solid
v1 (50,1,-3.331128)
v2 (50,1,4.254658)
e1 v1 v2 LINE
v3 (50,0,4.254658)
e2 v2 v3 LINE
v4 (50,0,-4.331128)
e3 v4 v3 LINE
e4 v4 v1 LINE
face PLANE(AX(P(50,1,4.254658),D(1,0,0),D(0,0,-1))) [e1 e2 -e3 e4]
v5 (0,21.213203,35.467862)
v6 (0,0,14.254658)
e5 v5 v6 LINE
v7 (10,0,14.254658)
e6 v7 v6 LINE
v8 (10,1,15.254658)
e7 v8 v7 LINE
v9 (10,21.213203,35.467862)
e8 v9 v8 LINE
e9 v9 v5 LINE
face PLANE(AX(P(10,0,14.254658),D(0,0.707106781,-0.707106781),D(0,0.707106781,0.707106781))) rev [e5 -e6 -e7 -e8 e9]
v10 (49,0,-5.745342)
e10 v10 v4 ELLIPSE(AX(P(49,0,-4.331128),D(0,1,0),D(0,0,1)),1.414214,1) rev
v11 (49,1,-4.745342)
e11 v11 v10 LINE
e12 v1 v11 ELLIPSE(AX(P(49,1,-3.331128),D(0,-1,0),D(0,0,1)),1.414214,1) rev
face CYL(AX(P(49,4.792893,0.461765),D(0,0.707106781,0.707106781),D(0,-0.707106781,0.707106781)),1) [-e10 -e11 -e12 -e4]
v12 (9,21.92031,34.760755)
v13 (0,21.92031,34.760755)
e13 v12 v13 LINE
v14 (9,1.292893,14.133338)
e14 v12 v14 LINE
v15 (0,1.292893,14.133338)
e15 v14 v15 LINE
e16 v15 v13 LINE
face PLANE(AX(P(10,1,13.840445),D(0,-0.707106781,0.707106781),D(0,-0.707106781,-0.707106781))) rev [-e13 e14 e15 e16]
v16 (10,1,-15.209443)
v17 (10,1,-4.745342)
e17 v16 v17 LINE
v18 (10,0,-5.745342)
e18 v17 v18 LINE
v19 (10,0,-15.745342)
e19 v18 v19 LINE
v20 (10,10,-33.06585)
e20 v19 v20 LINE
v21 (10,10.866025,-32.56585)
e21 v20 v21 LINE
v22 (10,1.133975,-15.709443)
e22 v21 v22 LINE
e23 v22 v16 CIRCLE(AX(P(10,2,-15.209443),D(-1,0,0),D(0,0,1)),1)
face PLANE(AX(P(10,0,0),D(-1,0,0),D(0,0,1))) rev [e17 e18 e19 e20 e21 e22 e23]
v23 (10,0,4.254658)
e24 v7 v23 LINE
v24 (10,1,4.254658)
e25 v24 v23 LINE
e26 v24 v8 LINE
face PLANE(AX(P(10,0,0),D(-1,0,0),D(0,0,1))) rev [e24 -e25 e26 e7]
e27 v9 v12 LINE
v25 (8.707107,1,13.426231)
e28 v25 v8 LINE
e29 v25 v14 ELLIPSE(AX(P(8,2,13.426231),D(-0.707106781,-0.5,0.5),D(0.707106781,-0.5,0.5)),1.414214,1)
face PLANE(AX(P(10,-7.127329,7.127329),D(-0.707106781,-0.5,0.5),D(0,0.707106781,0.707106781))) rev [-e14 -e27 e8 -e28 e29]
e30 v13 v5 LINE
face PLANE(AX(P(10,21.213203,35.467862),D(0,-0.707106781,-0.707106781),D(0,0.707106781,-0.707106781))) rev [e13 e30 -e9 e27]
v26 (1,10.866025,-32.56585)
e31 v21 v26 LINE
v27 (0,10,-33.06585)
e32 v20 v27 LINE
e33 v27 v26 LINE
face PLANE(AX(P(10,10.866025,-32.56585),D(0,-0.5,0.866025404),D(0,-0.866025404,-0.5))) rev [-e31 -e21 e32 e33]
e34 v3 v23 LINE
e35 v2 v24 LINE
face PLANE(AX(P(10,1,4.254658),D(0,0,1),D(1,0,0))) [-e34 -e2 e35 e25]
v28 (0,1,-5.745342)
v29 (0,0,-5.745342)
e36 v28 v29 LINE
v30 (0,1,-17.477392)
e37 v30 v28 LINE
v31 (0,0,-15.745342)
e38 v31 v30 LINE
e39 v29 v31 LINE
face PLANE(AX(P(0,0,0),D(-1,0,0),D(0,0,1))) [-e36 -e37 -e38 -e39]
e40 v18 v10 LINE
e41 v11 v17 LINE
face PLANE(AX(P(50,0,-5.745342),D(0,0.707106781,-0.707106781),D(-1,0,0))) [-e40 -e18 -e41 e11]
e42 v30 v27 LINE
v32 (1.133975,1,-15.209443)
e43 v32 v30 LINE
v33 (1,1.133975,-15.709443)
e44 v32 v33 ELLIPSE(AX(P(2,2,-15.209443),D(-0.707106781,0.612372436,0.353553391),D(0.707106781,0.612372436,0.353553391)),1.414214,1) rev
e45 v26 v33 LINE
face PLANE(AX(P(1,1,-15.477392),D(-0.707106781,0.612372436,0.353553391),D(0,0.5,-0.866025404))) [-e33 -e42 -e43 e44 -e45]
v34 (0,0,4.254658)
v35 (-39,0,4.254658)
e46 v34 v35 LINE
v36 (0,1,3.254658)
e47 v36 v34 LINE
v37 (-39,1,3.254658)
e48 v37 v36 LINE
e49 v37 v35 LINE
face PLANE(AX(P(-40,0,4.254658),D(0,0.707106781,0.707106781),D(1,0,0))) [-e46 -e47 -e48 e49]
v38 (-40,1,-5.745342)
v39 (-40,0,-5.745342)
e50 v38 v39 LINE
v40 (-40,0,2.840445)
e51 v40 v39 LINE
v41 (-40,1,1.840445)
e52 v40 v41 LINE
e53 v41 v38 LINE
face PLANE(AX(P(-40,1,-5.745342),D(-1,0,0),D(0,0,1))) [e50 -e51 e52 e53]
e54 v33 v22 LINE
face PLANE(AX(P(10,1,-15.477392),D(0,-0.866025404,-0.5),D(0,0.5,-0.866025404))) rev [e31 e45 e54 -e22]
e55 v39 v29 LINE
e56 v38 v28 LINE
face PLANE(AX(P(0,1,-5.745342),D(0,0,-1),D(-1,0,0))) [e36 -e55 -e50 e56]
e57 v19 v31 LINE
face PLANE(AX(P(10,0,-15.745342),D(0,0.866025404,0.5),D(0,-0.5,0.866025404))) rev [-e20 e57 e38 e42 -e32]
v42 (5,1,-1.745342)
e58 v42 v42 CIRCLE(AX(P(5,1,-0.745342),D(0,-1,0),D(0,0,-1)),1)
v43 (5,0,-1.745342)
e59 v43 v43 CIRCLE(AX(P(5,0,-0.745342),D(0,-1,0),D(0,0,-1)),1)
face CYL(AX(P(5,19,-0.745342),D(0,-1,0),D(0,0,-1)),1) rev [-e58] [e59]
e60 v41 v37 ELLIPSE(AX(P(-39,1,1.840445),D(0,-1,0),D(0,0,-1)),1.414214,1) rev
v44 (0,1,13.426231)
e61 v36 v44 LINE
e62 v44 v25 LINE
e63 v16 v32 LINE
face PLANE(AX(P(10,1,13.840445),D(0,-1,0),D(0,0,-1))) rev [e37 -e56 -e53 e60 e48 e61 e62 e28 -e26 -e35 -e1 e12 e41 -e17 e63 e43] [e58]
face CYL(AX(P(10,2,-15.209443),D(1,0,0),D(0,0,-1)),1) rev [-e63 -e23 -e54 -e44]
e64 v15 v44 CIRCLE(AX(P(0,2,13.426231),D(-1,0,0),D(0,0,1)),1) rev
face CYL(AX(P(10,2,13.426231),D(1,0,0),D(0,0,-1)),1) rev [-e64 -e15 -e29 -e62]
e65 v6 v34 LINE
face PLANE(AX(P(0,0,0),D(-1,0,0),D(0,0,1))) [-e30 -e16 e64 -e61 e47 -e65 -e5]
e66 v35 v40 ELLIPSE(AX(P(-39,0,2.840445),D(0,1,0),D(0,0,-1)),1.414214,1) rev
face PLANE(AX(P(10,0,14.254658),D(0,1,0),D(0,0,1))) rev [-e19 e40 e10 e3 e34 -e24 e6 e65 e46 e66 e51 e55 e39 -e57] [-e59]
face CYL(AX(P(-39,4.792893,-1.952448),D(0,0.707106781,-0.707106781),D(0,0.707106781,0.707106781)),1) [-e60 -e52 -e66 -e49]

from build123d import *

# Parameters (mm, degrees)
TOP_BLADE_FIRST_EXTRUDE_DEPTH  = 10
SKETCH3_W                      = 40
SKETCH3_H                      = 10
TOP_BLADE_SECOND_EXTRUDE_DEPTH = 1
TOP_BLADE_CUT_1_SIZE           = 1
TOP_BLADE_ROUNDING_1_R         = 1
SKETCH5_R                      = 1
TOP_BLADE_CUT_2_DEPTH          = 19
TOP_BLADE_ROUNDING_2_R         = 1


with BuildPart() as part:
    # Sketch1 → Top Blade First Extrude (new body)
    with BuildSketch(Plane(origin=(0, 0, 0), x_dir=(0, 0, -1), z_dir=(1, 0, 0))):
        Polygon((-14.254658385, 0), (15.745341615, 0), (33.065849691, 10), (32.565849691, 10.866025404), (15.477392422, 1), (-13.840444823, 1), (-34.76075504, 21.920310217), (-35.467861821, 21.213203436), align=None)
    extrude(amount=TOP_BLADE_FIRST_EXTRUDE_DEPTH)

    # Sketch3 → Top Blade Second Extrude (add)
    with BuildSketch(Plane.XZ):
        with Locations((-20, -0.745341615)):
            Rectangle(SKETCH3_W, SKETCH3_H)
        with Locations((30, -0.745341615)):
            Rectangle(SKETCH3_W, SKETCH3_H)
    extrude(amount=-TOP_BLADE_SECOND_EXTRUDE_DEPTH)

    # Top Blade Cut 1
    top_blade_cut_1_edges = [part.edges().sort_by_distance(p)[0] for p in [
        (-20, 1, 4.254658385),
        (0, 5.933012702, -24.021621057),
        (30, 1, -5.745341615),
        (10, 11.460155108, 24.300599931),
    ]]
    chamfer(top_blade_cut_1_edges, length=TOP_BLADE_CUT_1_SIZE - 0.0001)  # a hair under: the kernel refuses the full size

    # Top Blade Rounding 1
    top_blade_rounding_1_edges = [part.edges().sort_by_distance(p)[0] for p in [
        (-40, 0.50005, 3.754708385),
        (50, 0.50005, -5.245391615),
    ]]
    fillet(top_blade_rounding_1_edges, radius=TOP_BLADE_ROUNDING_1_R)

    # Sketch5 → Top Blade Cut 2 (cut)
    with BuildSketch(Plane.XZ):
        with Locations(Location((5, -0.745341615, 0), (0, 0, 270))):
            Circle(SKETCH5_R)
    extrude(amount=-TOP_BLADE_CUT_2_DEPTH, mode=Mode.SUBTRACT)

    # Top Blade Rounding 2
    top_blade_rounding_2_edges = [part.edges().sort_by_distance(p)[0] for p in [
        (4.50005, 1, 13.840444823),
        (5.49995, 1, -15.477392422),
    ]]
    fillet(top_blade_rounding_2_edges, radius=TOP_BLADE_ROUNDING_2_R)


solid = part.part
